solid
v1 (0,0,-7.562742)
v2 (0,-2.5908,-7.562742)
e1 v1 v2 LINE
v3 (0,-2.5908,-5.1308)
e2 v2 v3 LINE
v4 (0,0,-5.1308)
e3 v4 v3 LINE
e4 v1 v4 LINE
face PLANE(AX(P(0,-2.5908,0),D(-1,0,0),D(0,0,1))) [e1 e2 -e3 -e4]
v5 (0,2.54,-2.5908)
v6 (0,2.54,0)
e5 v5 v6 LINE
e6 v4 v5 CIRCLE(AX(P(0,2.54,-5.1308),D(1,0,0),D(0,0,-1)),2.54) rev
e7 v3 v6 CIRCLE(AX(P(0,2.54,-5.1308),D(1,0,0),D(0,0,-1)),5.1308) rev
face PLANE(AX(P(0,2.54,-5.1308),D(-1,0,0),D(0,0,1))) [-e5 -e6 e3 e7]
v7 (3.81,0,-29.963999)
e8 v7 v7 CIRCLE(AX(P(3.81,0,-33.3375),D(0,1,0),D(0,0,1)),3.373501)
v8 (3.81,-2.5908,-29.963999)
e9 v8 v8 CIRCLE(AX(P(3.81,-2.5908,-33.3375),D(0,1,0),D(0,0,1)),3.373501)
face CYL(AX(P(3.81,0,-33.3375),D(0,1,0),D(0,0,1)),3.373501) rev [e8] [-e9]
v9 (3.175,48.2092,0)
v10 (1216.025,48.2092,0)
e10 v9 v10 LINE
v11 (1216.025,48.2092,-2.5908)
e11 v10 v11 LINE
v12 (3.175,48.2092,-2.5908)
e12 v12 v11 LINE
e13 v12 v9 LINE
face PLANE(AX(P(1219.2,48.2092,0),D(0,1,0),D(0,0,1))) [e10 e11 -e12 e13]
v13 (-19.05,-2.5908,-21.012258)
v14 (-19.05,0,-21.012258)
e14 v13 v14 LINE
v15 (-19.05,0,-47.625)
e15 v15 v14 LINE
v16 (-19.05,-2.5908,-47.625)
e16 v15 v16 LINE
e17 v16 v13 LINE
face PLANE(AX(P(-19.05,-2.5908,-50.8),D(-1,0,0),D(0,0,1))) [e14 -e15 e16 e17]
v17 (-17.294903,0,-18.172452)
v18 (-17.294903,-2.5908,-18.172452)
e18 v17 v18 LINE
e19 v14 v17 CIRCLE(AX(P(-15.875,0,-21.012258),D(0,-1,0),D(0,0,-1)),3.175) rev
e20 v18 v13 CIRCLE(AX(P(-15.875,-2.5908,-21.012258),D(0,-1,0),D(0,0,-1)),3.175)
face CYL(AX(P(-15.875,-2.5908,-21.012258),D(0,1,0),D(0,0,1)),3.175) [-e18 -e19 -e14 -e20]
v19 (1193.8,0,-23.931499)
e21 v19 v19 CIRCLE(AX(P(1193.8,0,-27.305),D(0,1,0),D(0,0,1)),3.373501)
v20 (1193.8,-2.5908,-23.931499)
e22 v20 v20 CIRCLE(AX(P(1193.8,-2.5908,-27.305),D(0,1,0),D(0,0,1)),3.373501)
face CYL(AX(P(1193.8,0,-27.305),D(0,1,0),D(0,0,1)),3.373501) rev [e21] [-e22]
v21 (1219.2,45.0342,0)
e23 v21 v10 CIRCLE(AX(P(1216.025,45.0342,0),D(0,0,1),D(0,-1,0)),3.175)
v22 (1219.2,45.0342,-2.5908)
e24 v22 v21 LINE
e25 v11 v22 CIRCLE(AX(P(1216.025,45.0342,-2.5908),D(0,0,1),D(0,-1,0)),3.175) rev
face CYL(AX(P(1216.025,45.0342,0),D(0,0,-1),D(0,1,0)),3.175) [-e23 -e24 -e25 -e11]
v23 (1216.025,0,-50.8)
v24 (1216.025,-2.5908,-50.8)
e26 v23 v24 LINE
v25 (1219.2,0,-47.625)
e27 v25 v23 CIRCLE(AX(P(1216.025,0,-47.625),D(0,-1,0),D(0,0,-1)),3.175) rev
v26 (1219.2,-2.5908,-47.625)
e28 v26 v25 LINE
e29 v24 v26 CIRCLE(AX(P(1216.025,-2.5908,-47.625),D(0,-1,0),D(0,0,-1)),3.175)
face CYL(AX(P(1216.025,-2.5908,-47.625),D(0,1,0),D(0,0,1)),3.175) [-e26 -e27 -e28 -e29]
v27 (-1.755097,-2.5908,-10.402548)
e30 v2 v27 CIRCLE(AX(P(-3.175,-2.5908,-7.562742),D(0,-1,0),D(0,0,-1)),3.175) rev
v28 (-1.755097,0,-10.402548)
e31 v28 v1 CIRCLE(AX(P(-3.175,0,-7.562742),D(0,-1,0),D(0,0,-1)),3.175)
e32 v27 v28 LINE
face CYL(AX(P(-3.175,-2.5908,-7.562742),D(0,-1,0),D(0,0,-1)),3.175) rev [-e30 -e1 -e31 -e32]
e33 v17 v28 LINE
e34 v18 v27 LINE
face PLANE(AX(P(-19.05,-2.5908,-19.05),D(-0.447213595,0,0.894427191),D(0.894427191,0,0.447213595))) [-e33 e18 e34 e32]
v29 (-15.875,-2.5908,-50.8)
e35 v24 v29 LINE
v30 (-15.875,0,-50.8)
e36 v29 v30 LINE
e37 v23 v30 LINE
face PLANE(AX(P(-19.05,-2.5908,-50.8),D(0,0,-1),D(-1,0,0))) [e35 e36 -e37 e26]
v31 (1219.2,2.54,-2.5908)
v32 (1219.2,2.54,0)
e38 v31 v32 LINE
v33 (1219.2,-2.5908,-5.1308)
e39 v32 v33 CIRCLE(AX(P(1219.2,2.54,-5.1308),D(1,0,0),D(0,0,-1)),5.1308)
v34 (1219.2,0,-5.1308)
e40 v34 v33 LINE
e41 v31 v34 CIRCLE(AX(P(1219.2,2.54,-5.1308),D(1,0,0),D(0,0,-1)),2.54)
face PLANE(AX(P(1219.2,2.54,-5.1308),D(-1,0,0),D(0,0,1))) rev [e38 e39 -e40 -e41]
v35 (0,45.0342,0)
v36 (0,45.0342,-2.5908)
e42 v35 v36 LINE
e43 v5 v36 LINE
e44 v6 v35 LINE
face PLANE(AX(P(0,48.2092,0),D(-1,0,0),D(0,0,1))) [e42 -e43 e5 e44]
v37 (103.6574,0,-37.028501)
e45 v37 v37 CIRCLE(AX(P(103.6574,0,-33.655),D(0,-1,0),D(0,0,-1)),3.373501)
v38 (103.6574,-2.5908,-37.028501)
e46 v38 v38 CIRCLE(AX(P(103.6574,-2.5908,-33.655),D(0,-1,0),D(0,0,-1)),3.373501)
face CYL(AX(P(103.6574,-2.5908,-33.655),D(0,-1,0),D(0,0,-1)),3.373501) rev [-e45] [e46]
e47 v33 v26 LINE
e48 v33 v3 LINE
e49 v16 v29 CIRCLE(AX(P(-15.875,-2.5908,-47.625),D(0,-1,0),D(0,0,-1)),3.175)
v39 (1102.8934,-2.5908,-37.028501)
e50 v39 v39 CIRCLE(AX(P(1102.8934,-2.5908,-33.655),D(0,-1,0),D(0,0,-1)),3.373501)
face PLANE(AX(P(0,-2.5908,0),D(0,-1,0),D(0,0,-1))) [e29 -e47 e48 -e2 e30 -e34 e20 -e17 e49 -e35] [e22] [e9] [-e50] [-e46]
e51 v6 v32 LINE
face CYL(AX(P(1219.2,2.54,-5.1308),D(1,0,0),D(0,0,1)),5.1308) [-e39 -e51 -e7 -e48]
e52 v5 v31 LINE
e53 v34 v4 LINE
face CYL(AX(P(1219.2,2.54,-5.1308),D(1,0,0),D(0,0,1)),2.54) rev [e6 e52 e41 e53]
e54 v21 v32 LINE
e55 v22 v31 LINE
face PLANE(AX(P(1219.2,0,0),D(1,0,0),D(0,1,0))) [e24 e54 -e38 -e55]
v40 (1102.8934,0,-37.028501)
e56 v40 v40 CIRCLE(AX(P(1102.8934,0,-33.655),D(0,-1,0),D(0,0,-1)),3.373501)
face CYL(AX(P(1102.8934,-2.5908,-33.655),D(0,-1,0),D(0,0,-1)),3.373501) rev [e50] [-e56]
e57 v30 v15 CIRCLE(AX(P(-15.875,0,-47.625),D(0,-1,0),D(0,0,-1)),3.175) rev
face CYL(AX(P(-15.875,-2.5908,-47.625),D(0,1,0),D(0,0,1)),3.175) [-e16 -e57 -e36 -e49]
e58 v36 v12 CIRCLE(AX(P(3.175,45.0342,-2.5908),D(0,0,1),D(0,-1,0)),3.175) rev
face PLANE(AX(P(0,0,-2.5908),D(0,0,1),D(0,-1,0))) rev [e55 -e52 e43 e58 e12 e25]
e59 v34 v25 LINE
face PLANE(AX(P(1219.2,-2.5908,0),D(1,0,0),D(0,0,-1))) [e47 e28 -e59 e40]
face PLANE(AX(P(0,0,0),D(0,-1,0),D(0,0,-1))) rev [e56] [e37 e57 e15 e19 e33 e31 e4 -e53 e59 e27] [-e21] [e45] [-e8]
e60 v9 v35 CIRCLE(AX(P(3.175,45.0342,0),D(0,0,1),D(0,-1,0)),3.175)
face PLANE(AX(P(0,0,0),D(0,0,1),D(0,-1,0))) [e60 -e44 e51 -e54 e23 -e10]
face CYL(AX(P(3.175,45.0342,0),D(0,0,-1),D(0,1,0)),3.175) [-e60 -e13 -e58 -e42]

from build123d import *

# Parameters (mm, degrees)
BASE_FLANGE1_DEPTH               = 2.5908
EDGE_FLANGE1_STRIP_W             = 15.4432
EDGE_FLANGE1_STRIP_H             = 2.5908
EDGE_FLANGE1_STRIP_CUT_DEPTH     = 1219.2
EDGE_FLANGE1_DEPTH               = 1219.2
F_17_64_0_26563_DIAMETER_HOLE1_D = 6.747002
FILLET1_R                        = 3.175
F_17_64_0_26563_DIAMETER_HOLE2_D = 6.747002
F_17_64_0_26563_DIAMETER_HOLE3_D = 6.747002


# Sheet-metal steps are written as plain solids
with BuildPart() as part:
    # Sketch2 → Base-Flange1 (new body)
    with BuildSketch(Plane(origin=(0, 0, 0), x_dir=(1, 0, 0), z_dir=(0, 1, 0))):
        Polygon((0, 0), (1219.2, 0), (1219.2, 50.8), (-19.05, 50.8), (-19.05, 19.05), (0, 9.525), align=None)
    extrude(amount=-BASE_FLANGE1_DEPTH)

    # Edge-Flange1 strip (across the edge) → Edge-Flange1 strip cut (cut)
    with BuildSketch(Plane(origin=(0, 0, 0), x_dir=(0, 0, -1), z_dir=(1, 0, 0))):
        with Locations((-2.5908, -1.2954)):
            Rectangle(EDGE_FLANGE1_STRIP_W, EDGE_FLANGE1_STRIP_H)
    extrude(amount=EDGE_FLANGE1_STRIP_CUT_DEPTH, mode=Mode.SUBTRACT)

    # Edge-Flange1 section (across the edge) → Edge-Flange1 (add)
    with BuildSketch(Plane(origin=(0, 0, 0), x_dir=(0, 0, -1), z_dir=(1, 0, 0))):
        with BuildLine():
            Line((0, 2.54), (0, 48.2092))
            Line((0, 48.2092), (2.5908, 48.2092))
            Line((2.5908, 48.2092), (2.5908, 2.54))
            ThreePointArc((2.5908, 2.54), (3.334748776, 0.743948776), (5.1308, 0))
            Line((5.1308, 0), (5.1308, -2.5908))
            ThreePointArc((5.1308, -2.5908), (1.502776527, -1.088023473), (0, 2.54))
        make_face()
    extrude(amount=EDGE_FLANGE1_DEPTH)

    # 17/64 (0.26563) Diameter Hole1 (through all)
    with Locations(Plane(origin=(0, 0, 0), x_dir=(1, 0, 0), z_dir=(0, 1, 0))):
        with Locations((1193.8, 27.305)):
            Hole(F_17_64_0_26563_DIAMETER_HOLE1_D / 2)

    # Fillet1
    fillet1_edges = [part.edges().sort_by_distance(p)[0] for p in [
        (0, -1.2954, -9.525),
        (-19.05, -1.2954, -19.05),
        (-19.05, -1.2954, -50.8),
        (1219.2, -1.2954, -50.8),
        (0, 48.2092, -1.2954),
        (1219.2, 48.2092, -1.2954),
    ]]
    fillet(fillet1_edges, radius=FILLET1_R)

    # 17/64 (0.26563) Diameter Hole2 (through all)
    with Locations(Plane(origin=(0, 0, 0), x_dir=(1, 0, 0), z_dir=(0, 1, 0))):
        with Locations((3.81, 33.3375)):
            Hole(F_17_64_0_26563_DIAMETER_HOLE2_D / 2)

    # 17/64 (0.26563) Diameter Hole3 (through all)
    with Locations(Plane(origin=(0, -2.5908, 0), x_dir=(-1, 0, 0), z_dir=(0, -1, 0))):
        with Locations((-103.6574, 33.655), (-1102.8934, 33.655)):
            Hole(F_17_64_0_26563_DIAMETER_HOLE3_D / 2)


solid = part.part
